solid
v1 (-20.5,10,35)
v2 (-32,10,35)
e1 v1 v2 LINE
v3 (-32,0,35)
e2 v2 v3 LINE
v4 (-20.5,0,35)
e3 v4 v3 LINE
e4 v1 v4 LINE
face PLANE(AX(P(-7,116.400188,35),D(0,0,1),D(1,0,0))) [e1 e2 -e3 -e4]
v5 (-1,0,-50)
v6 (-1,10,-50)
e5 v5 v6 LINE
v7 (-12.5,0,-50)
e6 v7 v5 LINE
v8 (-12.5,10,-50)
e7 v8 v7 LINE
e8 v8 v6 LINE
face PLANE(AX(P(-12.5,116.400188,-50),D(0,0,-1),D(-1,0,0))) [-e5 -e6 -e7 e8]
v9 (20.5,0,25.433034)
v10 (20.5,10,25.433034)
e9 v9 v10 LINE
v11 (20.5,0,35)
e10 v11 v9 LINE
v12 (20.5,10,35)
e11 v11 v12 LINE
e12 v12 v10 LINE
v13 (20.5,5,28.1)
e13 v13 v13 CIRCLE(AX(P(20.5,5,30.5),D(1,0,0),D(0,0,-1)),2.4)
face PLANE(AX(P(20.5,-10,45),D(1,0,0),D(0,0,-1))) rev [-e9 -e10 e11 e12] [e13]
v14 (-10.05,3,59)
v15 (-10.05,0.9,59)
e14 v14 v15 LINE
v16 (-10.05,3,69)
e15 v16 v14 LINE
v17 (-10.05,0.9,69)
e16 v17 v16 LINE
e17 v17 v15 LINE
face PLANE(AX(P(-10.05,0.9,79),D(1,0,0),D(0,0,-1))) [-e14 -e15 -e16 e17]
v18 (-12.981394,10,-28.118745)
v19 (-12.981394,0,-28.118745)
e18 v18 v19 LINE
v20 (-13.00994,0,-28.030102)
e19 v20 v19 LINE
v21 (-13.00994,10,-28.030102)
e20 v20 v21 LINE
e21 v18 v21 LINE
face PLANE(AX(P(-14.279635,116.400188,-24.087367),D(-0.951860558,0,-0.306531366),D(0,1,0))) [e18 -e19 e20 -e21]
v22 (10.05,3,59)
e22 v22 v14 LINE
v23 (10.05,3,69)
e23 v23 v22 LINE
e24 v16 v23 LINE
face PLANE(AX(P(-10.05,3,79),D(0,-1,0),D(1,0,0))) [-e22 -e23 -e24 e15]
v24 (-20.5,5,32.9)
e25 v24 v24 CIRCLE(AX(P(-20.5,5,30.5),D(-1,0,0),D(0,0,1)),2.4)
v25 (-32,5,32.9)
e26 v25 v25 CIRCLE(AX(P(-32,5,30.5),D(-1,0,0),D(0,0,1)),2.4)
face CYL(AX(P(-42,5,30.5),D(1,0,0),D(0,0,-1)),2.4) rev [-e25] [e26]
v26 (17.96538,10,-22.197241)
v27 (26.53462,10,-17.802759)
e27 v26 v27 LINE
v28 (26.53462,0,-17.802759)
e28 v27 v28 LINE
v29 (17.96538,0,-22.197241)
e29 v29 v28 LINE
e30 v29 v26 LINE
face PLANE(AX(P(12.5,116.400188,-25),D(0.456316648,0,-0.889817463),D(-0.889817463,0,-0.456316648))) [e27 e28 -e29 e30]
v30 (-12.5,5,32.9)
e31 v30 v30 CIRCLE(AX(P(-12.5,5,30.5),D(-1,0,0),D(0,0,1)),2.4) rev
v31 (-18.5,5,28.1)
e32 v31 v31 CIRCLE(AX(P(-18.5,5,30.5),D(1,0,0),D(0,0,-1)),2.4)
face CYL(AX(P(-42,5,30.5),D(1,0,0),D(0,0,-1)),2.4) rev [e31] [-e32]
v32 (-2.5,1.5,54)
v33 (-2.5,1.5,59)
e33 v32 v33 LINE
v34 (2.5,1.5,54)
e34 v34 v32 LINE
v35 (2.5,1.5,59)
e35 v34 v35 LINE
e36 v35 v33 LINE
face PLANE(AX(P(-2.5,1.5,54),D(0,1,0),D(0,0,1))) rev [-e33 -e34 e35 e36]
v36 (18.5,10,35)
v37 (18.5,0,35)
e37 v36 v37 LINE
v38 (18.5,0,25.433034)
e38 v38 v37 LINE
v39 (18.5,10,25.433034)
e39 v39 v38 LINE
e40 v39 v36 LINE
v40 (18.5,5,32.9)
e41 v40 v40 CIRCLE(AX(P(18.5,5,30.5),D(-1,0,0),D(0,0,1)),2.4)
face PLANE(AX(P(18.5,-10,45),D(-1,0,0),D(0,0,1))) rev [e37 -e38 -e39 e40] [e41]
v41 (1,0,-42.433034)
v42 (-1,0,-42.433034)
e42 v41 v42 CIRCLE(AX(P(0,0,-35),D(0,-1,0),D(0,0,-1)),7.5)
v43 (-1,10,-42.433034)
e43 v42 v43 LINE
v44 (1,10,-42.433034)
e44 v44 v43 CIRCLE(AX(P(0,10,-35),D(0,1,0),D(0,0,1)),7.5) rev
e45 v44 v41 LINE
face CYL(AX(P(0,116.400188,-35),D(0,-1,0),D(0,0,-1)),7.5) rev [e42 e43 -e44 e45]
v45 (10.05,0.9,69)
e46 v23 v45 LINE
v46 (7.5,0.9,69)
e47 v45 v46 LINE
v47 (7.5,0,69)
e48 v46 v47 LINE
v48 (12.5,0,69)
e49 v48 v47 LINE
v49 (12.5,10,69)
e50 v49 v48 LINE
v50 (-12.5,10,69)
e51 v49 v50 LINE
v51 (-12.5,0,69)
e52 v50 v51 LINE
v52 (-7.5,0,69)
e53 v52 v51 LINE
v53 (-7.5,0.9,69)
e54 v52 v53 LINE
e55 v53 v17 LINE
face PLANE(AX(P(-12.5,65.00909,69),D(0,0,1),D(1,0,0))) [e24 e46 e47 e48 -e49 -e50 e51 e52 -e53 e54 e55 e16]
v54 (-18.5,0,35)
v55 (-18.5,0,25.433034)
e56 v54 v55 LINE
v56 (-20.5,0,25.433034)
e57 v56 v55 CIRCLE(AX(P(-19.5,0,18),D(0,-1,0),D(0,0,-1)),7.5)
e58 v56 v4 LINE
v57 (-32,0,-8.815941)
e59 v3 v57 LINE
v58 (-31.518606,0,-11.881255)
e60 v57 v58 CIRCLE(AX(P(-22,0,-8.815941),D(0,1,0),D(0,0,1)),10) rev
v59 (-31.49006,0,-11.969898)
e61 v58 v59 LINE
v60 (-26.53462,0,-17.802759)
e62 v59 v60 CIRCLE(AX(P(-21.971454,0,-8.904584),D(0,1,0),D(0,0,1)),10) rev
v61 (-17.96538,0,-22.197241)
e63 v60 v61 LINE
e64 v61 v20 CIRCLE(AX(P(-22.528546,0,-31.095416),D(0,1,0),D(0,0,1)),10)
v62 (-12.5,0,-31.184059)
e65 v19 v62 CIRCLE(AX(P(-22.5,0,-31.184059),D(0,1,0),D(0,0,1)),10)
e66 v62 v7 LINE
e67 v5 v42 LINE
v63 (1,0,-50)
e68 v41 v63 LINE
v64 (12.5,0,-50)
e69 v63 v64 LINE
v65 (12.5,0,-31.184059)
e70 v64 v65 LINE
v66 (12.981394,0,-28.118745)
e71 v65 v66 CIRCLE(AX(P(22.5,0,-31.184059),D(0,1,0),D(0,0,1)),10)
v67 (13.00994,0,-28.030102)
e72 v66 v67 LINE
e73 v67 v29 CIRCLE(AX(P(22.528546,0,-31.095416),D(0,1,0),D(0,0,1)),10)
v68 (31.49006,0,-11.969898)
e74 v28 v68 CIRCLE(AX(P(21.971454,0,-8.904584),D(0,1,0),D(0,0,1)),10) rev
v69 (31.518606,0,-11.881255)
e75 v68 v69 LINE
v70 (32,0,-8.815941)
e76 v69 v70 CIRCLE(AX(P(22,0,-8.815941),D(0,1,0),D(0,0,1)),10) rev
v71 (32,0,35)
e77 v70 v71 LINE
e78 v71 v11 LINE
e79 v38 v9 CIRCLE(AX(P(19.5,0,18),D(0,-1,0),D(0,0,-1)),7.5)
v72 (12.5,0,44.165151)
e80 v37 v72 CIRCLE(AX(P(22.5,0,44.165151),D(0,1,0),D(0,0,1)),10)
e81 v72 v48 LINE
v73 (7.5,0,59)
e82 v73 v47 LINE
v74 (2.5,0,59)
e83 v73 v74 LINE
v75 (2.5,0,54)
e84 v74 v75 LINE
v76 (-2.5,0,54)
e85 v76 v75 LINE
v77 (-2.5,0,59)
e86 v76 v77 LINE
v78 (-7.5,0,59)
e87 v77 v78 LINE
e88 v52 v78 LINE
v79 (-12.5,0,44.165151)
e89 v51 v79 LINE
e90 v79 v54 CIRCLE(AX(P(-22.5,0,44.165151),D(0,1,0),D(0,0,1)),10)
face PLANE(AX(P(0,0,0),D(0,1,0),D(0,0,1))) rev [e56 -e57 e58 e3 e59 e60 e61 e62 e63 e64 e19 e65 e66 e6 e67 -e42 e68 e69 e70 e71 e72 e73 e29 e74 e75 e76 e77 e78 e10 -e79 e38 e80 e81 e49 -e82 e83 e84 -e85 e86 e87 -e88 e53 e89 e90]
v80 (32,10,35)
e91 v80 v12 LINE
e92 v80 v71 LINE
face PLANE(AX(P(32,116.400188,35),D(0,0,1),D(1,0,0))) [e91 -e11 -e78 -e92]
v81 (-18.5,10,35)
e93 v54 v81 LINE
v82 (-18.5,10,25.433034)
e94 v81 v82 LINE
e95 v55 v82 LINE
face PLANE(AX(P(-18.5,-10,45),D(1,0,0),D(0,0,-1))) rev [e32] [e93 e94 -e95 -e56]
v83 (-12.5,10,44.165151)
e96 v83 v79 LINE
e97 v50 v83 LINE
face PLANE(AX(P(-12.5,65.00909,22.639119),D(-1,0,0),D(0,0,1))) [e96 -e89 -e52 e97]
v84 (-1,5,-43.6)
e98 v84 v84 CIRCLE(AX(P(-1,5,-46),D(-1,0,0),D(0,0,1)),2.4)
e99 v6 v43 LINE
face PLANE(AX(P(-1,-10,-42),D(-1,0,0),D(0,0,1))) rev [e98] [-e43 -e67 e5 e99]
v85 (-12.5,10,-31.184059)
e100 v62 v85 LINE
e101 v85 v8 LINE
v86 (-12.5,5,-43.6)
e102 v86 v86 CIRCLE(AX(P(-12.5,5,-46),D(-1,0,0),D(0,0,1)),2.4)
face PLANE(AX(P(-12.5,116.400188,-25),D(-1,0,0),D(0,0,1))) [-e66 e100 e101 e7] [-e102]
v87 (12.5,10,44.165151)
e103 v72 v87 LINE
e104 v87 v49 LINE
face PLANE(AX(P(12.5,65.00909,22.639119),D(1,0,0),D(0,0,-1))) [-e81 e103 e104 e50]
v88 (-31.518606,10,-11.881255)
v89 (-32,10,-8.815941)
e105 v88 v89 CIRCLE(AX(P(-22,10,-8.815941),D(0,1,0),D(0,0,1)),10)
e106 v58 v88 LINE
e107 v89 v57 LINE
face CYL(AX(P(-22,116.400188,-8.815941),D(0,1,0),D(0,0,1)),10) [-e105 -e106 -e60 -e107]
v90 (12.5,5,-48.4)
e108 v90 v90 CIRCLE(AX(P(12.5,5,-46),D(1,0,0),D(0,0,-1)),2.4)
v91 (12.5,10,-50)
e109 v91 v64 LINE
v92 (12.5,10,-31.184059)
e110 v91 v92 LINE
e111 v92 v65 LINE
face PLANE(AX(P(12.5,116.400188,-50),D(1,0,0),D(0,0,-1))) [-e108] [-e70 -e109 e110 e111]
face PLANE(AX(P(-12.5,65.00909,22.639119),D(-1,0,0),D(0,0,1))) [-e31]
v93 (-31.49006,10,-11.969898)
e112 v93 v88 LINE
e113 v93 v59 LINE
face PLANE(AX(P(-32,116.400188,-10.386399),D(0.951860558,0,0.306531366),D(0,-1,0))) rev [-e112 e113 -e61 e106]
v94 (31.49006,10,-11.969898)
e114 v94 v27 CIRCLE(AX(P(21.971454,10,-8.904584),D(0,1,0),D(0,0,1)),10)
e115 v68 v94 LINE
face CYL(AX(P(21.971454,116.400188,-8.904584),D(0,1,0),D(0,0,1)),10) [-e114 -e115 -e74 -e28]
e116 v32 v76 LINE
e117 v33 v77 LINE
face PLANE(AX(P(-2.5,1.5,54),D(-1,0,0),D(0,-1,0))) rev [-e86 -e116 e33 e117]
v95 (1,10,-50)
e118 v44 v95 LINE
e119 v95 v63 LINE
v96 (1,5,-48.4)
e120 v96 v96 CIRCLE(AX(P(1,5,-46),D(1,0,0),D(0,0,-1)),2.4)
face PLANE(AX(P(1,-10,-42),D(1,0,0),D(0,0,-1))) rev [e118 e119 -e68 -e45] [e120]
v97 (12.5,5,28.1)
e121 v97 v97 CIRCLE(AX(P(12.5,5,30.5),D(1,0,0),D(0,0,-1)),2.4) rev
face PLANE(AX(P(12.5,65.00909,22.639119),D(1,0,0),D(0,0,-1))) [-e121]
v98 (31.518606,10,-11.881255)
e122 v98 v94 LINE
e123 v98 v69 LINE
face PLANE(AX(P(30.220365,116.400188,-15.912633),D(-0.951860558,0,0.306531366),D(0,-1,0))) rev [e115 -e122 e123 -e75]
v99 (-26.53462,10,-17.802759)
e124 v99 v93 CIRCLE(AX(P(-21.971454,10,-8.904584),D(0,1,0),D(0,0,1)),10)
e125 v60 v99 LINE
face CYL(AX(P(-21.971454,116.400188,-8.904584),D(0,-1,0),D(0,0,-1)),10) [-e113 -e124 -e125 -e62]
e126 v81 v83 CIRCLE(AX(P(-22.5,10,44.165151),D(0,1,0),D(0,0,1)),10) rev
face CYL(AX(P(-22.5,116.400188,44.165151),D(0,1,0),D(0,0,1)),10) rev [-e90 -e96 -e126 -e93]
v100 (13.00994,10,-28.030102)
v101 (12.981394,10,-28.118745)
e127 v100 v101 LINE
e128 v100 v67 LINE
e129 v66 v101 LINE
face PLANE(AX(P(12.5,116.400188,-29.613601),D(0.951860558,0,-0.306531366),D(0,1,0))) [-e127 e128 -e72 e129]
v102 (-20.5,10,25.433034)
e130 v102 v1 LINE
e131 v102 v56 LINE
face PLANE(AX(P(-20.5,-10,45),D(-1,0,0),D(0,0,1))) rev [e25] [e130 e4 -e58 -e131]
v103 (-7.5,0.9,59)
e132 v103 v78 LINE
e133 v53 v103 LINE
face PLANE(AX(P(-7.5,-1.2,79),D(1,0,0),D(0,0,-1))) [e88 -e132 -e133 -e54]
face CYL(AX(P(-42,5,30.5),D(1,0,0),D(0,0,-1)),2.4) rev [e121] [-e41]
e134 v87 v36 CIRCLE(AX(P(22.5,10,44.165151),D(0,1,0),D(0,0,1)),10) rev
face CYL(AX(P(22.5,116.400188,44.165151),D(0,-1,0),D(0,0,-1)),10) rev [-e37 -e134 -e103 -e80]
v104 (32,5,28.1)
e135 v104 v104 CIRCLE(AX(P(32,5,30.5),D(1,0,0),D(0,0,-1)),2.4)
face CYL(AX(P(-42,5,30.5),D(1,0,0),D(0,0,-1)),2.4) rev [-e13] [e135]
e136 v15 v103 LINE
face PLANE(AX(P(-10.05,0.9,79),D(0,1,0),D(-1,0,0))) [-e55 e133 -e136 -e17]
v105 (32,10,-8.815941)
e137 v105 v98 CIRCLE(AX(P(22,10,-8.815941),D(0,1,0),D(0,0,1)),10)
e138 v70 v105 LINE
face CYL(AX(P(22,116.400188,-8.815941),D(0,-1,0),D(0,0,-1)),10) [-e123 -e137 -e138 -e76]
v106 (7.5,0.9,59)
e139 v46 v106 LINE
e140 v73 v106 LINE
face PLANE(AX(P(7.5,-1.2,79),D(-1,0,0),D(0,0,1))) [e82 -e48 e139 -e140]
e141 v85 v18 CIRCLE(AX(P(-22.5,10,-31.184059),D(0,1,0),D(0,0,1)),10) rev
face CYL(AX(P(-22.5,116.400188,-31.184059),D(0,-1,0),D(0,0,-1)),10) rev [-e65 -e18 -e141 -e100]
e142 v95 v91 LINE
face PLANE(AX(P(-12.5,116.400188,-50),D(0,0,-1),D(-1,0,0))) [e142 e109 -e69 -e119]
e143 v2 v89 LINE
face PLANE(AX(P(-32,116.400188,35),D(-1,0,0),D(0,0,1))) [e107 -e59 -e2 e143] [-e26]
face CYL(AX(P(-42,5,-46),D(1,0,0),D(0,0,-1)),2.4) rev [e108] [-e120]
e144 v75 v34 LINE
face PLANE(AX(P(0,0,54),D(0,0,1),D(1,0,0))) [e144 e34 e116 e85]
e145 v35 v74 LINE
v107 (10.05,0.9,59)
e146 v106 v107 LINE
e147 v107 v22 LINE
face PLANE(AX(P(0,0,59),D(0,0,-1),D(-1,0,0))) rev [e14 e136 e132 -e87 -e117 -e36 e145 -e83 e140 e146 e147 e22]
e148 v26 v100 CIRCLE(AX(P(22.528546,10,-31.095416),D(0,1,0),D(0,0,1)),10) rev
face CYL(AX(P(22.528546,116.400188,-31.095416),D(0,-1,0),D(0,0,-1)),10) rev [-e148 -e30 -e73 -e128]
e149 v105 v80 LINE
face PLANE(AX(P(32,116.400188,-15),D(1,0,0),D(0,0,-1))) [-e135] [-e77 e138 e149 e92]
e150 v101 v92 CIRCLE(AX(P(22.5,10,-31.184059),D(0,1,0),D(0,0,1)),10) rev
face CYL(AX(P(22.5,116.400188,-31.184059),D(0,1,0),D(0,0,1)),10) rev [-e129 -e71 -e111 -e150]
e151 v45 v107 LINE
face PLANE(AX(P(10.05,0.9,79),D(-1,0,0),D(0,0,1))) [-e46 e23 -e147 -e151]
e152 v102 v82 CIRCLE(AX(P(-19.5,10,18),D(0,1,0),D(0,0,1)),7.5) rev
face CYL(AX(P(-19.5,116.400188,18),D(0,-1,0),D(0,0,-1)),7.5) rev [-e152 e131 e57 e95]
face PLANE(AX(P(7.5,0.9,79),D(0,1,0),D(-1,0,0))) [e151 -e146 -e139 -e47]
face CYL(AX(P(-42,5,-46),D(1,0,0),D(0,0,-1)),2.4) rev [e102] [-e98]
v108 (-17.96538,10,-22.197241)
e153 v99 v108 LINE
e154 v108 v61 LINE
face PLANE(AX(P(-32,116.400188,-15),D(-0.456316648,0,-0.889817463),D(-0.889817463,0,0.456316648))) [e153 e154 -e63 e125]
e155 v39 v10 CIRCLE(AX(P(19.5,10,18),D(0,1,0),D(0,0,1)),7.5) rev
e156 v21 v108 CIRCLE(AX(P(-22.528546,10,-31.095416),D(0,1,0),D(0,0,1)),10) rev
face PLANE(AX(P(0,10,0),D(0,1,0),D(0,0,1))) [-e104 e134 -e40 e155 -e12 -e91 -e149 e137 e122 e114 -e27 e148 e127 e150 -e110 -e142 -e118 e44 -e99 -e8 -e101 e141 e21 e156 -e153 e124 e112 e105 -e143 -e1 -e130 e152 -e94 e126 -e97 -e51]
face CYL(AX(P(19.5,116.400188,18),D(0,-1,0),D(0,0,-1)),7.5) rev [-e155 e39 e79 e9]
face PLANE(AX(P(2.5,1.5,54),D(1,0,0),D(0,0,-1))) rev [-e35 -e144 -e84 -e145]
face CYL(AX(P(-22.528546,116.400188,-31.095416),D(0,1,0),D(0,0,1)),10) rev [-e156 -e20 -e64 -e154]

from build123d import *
from OCP.BRepFilletAPI import BRepFilletAPI_MakeChamfer

# Parameters (mm, degrees)
SKETCH1_W               = 24
SKETCH1_H               = 40
BOSS_EXTRUDE1_DEPTH     = 10
SKETCH2_R               = 7.5
BOSS_EXTRUDE2_DEPTH     = 10
SKETCH4_W               = 2
SKETCH4_H               = 20
SKETCH4_H_2             = 16
CUT_EXTRUDE1_DEPTH      = 20
SKETCH5_R               = 2.4
CUT_EXTRUDE2_DEPTH      = 74
CHAMFER3_SIZE           = 2
CHAMFER3_SIZE2          = 4.613601474
BOSS_EXTRUDE3_DEPTH     = 10
CUT_EXTRUDE3_DEPTH      = 10
CUT_EXTRUDE3_DEPTH_BACK = 10
FILLET1_R               = 10
SKETCH8_W               = 5
SKETCH8_H               = 3
CUT_EXTRUDE4_DEPTH      = 5


with BuildPart() as part:
    # Sketch1 → Boss-Extrude1 (new body)
    with BuildSketch(Plane(origin=(0, 0, 0), x_dir=(1, 0, 0), z_dir=(0, 1, 0))):
        Rectangle(SKETCH1_W, SKETCH1_H)
    extrude(amount=BOSS_EXTRUDE1_DEPTH)

    # Sketch2 → Boss-Extrude2 (add)
    with BuildSketch(Plane.XZ):
        Polygon((7, -20), (-7, -20), (-7, 35), (-32, 35), (-32, -15), (-12.5, -25), (-12.5, -50), (12.5, -50), (12.5, -25), (32, -15), (32, 35), (7, 35), align=None)
        with Locations(Location((0, -35, 0), (0, 0, 270))):
            Circle(SKETCH2_R, mode=Mode.SUBTRACT)
        with Locations(Location((-19.5, 18, 0), (0, 0, 270))):
            Circle(SKETCH2_R, mode=Mode.SUBTRACT)
        with Locations(Location((19.5, 18, 0), (0, 0, 270))):
            Circle(SKETCH2_R, mode=Mode.SUBTRACT)
    extrude(amount=-BOSS_EXTRUDE2_DEPTH)

    # Sketch4 → Cut-Extrude1 (cut)
    with BuildSketch(Plane(origin=(0, 10, 0), x_dir=(1, 0, 0), z_dir=(0, 1, 0))):
        with Locations((19.5, -35)):
            Rectangle(SKETCH4_W, SKETCH4_H)
        with Locations((-19.5, -35)):
            Rectangle(SKETCH4_W, SKETCH4_H)
        with Locations((0, 50)):
            Rectangle(SKETCH4_W, SKETCH4_H_2)
    extrude(amount=-CUT_EXTRUDE1_DEPTH, mode=Mode.SUBTRACT)

    # Sketch5 → Cut-Extrude2 (cut)
    with BuildSketch(Plane(origin=(32, 0, 0), x_dir=(0, 0, -1), z_dir=(1, 0, 0))):
        with Locations(Location((-30.5, 5, 0), (0, 0, 180))):
            Circle(SKETCH5_R)
        with Locations(Location((46, 5, 0), (0, 0, 180))):
            Circle(SKETCH5_R)
    extrude(amount=-CUT_EXTRUDE2_DEPTH, mode=Mode.SUBTRACT)

    # Chamfer3: one chamfer whose edges measure the first distance from different faces: ONE call of the kernel's chamfer builder (chamfer() names one face for all edges)
    chamfer3_edges_1 = [part.edges().sort_by_distance(p)[0] for p in [
        (-12.5, 5, -25),
        (-32, 5, -15),
    ]]
    chamfer3_side_1 = [part.faces().sort_by_distance(p)[0] for p in [
        (-22.25, 5, -20),
    ]]
    chamfer3_edges_2 = [part.edges().sort_by_distance(p)[0] for p in [
        (32, 5, -15),
        (12.5, 5, -25),
    ]]
    chamfer3_side_2 = [part.faces().sort_by_distance(p)[0] for p in [
        (22.25, 5, -20),
    ]]
    chamfer3 = BRepFilletAPI_MakeChamfer(part.part.solid().wrapped)
    for e in chamfer3_edges_1:
        chamfer3.Add(CHAMFER3_SIZE, CHAMFER3_SIZE2, e.wrapped, chamfer3_side_1[0].wrapped)  # the first distance lies on this face
    for e in chamfer3_edges_2:
        chamfer3.Add(CHAMFER3_SIZE, CHAMFER3_SIZE2, e.wrapped, chamfer3_side_2[0].wrapped)  # the first distance lies on this face
    add(Compound.cast(chamfer3.Shape()), mode=Mode.REPLACE)

    # Sketch6 → Boss-Extrude3 (add)
    with BuildSketch(Plane.XZ):
        Polygon((-12.5, 22.639119403), (-12.5, 69), (12.5, 69), (12.5, 22.639119403), (7, 20), (-7, 20), align=None)
    extrude(amount=-BOSS_EXTRUDE3_DEPTH)

    # Sketch7 → Cut-Extrude3 (cut, two sides: drawn at the far end of the back side and taken through both)
    with BuildSketch(Plane.XY.offset(69).offset(-CUT_EXTRUDE3_DEPTH_BACK)):
        Polygon((-10.05, 0.9), (-7.5, 0.9), (-7.5, -1.2), (7.5, -1.2), (7.5, 0.9), (10.05, 0.9), (10.05, 3), (-10.05, 3), align=None)
    extrude(amount=CUT_EXTRUDE3_DEPTH + CUT_EXTRUDE3_DEPTH_BACK, mode=Mode.SUBTRACT)

    # Fillet1
    # the kernel refuses this fillet: 10 mm, written as the material it adds along each edge
    with BuildSketch(Plane(origin=(12.5, 0, -29.613601474), x_dir=(0.3065313660894553, 0, 0.9518605578567336), z_dir=(0, 1, 0)), Plane(origin=(-12.5, 0, -29.613601474), x_dir=(0, 0, -1), z_dir=(0, 1, 0))) as fillet1_piece_1:
        with BuildLine():
            CenterArc((FILLET1_R * 0.15704572996, FILLET1_R), FILLET1_R, 252.149681698, 17.850318302)
            Line((-FILLET1_R * 0.149485636129, FILLET1_R * 0.0481394421433), (0, 0))
            Line((0, 0), (FILLET1_R * 0.15704572996, 0))
        make_face()
    extrude(amount=10)
    with BuildSketch(Plane(origin=(14.279634926, 0, -24.087366705), x_dir=(0.8898174628127374, 0, 0.4563166475962744), z_dir=(0, 1, 0)), Plane(origin=(-14.279634926, 0, -24.087366705), x_dir=(0.30653136608945597, 0, -0.9518605578567335), z_dir=(0, 1, 0))) as fillet1_piece_2:
        with BuildLine():
            CenterArc((FILLET1_R * 0.414213562373, FILLET1_R), FILLET1_R, 225, 45)
            Line((-FILLET1_R * 0.292893218813, FILLET1_R * 0.292893218813), (0, 0))
            Line((0, 0), (FILLET1_R * 0.414213562373, 0))
        make_face()
    extrude(amount=10)
    with BuildSketch(Plane(origin=(12.5, 10, 35), x_dir=(0, 0, 1), z_dir=(0, -1, 0))) as fillet1_piece_3:
        with BuildLine():
            CenterArc((9.16515139, -10), FILLET1_R, 90, 66.421821522)
            Line((0, -6), (0, 0))
            Line((0, 0), (9.16515139, 0))
        make_face()
    extrude(amount=10)
    with BuildSketch(Plane(origin=(-12.5, 0, 35), x_dir=(-1, 0, 0), z_dir=(0, 1, 0))) as fillet1_piece_4:
        with BuildLine():
            CenterArc((10, 9.16515139), FILLET1_R, 180, 66.421821522)
            Line((0, 9.16515139), (0, 0))
            Line((0, 0), (6, 0))
        make_face()
    extrude(amount=10)
    # the kernel refuses this fillet: 10 mm, written as the material it takes off along each edge
    with BuildSketch(Plane(origin=(30.220365074, -10.355339059, -15.912633295), x_dir=(-0.8898174628127375, 0, -0.45631664759627466), z_dir=(0, 1, 0))) as fillet1_2_piece_1:
        with BuildLine():
            CenterArc((FILLET1_R * 0.414213562373, FILLET1_R), FILLET1_R, 225, 45)
            Line((-FILLET1_R * 0.292893218813, FILLET1_R * 0.292893218813), (0, 0))
            Line((0, 0), (FILLET1_R * 0.414213562373, 0))
        make_face()
    extrude(amount=30.710678119, mode=Mode.SUBTRACT)
    with BuildSketch(Plane(origin=(32, -3.926143249, -10.386398526), x_dir=(0, 0, 1), z_dir=(0, 1, 0)), Plane(origin=(-32, -3.926143249, -10.386398526), x_dir=(0.3065313660894543, 0, -0.9518605578567341), z_dir=(0, 1, 0))) as fillet1_2_piece_2:
        with BuildLine():
            CenterArc((FILLET1_R * 0.15704572996, -FILLET1_R), FILLET1_R, 90, 17.850318302)
            Line((-FILLET1_R * 0.149485636129, -FILLET1_R * 0.0481394421433), (0, 0))
            Line((0, 0), (FILLET1_R * 0.15704572996, 0))
        make_face()
    extrude(amount=17.852286498, mode=Mode.SUBTRACT)
    with BuildSketch(Plane(origin=(-30.220365074, -10.355339059, -15.912633295), x_dir=(0.889817462812737, 0, -0.45631664759627527), z_dir=(0, 1, 0))) as fillet1_2_piece_3:
        with BuildLine():
            CenterArc((FILLET1_R * 0.414213562373, -FILLET1_R), FILLET1_R, 90, 45)
            Line((-FILLET1_R * 0.292893218813, -FILLET1_R * 0.292893218813), (0, 0))
            Line((0, 0), (FILLET1_R * 0.414213562373, 0))
        make_face()
    extrude(amount=30.710678119, mode=Mode.SUBTRACT)

    # Sketch8 → Cut-Extrude4 (cut)
    with BuildSketch(Plane.XY.offset(59)):
        Rectangle(SKETCH8_W, SKETCH8_H)
    extrude(amount=-CUT_EXTRUDE4_DEPTH, mode=Mode.SUBTRACT)


solid = part.part
